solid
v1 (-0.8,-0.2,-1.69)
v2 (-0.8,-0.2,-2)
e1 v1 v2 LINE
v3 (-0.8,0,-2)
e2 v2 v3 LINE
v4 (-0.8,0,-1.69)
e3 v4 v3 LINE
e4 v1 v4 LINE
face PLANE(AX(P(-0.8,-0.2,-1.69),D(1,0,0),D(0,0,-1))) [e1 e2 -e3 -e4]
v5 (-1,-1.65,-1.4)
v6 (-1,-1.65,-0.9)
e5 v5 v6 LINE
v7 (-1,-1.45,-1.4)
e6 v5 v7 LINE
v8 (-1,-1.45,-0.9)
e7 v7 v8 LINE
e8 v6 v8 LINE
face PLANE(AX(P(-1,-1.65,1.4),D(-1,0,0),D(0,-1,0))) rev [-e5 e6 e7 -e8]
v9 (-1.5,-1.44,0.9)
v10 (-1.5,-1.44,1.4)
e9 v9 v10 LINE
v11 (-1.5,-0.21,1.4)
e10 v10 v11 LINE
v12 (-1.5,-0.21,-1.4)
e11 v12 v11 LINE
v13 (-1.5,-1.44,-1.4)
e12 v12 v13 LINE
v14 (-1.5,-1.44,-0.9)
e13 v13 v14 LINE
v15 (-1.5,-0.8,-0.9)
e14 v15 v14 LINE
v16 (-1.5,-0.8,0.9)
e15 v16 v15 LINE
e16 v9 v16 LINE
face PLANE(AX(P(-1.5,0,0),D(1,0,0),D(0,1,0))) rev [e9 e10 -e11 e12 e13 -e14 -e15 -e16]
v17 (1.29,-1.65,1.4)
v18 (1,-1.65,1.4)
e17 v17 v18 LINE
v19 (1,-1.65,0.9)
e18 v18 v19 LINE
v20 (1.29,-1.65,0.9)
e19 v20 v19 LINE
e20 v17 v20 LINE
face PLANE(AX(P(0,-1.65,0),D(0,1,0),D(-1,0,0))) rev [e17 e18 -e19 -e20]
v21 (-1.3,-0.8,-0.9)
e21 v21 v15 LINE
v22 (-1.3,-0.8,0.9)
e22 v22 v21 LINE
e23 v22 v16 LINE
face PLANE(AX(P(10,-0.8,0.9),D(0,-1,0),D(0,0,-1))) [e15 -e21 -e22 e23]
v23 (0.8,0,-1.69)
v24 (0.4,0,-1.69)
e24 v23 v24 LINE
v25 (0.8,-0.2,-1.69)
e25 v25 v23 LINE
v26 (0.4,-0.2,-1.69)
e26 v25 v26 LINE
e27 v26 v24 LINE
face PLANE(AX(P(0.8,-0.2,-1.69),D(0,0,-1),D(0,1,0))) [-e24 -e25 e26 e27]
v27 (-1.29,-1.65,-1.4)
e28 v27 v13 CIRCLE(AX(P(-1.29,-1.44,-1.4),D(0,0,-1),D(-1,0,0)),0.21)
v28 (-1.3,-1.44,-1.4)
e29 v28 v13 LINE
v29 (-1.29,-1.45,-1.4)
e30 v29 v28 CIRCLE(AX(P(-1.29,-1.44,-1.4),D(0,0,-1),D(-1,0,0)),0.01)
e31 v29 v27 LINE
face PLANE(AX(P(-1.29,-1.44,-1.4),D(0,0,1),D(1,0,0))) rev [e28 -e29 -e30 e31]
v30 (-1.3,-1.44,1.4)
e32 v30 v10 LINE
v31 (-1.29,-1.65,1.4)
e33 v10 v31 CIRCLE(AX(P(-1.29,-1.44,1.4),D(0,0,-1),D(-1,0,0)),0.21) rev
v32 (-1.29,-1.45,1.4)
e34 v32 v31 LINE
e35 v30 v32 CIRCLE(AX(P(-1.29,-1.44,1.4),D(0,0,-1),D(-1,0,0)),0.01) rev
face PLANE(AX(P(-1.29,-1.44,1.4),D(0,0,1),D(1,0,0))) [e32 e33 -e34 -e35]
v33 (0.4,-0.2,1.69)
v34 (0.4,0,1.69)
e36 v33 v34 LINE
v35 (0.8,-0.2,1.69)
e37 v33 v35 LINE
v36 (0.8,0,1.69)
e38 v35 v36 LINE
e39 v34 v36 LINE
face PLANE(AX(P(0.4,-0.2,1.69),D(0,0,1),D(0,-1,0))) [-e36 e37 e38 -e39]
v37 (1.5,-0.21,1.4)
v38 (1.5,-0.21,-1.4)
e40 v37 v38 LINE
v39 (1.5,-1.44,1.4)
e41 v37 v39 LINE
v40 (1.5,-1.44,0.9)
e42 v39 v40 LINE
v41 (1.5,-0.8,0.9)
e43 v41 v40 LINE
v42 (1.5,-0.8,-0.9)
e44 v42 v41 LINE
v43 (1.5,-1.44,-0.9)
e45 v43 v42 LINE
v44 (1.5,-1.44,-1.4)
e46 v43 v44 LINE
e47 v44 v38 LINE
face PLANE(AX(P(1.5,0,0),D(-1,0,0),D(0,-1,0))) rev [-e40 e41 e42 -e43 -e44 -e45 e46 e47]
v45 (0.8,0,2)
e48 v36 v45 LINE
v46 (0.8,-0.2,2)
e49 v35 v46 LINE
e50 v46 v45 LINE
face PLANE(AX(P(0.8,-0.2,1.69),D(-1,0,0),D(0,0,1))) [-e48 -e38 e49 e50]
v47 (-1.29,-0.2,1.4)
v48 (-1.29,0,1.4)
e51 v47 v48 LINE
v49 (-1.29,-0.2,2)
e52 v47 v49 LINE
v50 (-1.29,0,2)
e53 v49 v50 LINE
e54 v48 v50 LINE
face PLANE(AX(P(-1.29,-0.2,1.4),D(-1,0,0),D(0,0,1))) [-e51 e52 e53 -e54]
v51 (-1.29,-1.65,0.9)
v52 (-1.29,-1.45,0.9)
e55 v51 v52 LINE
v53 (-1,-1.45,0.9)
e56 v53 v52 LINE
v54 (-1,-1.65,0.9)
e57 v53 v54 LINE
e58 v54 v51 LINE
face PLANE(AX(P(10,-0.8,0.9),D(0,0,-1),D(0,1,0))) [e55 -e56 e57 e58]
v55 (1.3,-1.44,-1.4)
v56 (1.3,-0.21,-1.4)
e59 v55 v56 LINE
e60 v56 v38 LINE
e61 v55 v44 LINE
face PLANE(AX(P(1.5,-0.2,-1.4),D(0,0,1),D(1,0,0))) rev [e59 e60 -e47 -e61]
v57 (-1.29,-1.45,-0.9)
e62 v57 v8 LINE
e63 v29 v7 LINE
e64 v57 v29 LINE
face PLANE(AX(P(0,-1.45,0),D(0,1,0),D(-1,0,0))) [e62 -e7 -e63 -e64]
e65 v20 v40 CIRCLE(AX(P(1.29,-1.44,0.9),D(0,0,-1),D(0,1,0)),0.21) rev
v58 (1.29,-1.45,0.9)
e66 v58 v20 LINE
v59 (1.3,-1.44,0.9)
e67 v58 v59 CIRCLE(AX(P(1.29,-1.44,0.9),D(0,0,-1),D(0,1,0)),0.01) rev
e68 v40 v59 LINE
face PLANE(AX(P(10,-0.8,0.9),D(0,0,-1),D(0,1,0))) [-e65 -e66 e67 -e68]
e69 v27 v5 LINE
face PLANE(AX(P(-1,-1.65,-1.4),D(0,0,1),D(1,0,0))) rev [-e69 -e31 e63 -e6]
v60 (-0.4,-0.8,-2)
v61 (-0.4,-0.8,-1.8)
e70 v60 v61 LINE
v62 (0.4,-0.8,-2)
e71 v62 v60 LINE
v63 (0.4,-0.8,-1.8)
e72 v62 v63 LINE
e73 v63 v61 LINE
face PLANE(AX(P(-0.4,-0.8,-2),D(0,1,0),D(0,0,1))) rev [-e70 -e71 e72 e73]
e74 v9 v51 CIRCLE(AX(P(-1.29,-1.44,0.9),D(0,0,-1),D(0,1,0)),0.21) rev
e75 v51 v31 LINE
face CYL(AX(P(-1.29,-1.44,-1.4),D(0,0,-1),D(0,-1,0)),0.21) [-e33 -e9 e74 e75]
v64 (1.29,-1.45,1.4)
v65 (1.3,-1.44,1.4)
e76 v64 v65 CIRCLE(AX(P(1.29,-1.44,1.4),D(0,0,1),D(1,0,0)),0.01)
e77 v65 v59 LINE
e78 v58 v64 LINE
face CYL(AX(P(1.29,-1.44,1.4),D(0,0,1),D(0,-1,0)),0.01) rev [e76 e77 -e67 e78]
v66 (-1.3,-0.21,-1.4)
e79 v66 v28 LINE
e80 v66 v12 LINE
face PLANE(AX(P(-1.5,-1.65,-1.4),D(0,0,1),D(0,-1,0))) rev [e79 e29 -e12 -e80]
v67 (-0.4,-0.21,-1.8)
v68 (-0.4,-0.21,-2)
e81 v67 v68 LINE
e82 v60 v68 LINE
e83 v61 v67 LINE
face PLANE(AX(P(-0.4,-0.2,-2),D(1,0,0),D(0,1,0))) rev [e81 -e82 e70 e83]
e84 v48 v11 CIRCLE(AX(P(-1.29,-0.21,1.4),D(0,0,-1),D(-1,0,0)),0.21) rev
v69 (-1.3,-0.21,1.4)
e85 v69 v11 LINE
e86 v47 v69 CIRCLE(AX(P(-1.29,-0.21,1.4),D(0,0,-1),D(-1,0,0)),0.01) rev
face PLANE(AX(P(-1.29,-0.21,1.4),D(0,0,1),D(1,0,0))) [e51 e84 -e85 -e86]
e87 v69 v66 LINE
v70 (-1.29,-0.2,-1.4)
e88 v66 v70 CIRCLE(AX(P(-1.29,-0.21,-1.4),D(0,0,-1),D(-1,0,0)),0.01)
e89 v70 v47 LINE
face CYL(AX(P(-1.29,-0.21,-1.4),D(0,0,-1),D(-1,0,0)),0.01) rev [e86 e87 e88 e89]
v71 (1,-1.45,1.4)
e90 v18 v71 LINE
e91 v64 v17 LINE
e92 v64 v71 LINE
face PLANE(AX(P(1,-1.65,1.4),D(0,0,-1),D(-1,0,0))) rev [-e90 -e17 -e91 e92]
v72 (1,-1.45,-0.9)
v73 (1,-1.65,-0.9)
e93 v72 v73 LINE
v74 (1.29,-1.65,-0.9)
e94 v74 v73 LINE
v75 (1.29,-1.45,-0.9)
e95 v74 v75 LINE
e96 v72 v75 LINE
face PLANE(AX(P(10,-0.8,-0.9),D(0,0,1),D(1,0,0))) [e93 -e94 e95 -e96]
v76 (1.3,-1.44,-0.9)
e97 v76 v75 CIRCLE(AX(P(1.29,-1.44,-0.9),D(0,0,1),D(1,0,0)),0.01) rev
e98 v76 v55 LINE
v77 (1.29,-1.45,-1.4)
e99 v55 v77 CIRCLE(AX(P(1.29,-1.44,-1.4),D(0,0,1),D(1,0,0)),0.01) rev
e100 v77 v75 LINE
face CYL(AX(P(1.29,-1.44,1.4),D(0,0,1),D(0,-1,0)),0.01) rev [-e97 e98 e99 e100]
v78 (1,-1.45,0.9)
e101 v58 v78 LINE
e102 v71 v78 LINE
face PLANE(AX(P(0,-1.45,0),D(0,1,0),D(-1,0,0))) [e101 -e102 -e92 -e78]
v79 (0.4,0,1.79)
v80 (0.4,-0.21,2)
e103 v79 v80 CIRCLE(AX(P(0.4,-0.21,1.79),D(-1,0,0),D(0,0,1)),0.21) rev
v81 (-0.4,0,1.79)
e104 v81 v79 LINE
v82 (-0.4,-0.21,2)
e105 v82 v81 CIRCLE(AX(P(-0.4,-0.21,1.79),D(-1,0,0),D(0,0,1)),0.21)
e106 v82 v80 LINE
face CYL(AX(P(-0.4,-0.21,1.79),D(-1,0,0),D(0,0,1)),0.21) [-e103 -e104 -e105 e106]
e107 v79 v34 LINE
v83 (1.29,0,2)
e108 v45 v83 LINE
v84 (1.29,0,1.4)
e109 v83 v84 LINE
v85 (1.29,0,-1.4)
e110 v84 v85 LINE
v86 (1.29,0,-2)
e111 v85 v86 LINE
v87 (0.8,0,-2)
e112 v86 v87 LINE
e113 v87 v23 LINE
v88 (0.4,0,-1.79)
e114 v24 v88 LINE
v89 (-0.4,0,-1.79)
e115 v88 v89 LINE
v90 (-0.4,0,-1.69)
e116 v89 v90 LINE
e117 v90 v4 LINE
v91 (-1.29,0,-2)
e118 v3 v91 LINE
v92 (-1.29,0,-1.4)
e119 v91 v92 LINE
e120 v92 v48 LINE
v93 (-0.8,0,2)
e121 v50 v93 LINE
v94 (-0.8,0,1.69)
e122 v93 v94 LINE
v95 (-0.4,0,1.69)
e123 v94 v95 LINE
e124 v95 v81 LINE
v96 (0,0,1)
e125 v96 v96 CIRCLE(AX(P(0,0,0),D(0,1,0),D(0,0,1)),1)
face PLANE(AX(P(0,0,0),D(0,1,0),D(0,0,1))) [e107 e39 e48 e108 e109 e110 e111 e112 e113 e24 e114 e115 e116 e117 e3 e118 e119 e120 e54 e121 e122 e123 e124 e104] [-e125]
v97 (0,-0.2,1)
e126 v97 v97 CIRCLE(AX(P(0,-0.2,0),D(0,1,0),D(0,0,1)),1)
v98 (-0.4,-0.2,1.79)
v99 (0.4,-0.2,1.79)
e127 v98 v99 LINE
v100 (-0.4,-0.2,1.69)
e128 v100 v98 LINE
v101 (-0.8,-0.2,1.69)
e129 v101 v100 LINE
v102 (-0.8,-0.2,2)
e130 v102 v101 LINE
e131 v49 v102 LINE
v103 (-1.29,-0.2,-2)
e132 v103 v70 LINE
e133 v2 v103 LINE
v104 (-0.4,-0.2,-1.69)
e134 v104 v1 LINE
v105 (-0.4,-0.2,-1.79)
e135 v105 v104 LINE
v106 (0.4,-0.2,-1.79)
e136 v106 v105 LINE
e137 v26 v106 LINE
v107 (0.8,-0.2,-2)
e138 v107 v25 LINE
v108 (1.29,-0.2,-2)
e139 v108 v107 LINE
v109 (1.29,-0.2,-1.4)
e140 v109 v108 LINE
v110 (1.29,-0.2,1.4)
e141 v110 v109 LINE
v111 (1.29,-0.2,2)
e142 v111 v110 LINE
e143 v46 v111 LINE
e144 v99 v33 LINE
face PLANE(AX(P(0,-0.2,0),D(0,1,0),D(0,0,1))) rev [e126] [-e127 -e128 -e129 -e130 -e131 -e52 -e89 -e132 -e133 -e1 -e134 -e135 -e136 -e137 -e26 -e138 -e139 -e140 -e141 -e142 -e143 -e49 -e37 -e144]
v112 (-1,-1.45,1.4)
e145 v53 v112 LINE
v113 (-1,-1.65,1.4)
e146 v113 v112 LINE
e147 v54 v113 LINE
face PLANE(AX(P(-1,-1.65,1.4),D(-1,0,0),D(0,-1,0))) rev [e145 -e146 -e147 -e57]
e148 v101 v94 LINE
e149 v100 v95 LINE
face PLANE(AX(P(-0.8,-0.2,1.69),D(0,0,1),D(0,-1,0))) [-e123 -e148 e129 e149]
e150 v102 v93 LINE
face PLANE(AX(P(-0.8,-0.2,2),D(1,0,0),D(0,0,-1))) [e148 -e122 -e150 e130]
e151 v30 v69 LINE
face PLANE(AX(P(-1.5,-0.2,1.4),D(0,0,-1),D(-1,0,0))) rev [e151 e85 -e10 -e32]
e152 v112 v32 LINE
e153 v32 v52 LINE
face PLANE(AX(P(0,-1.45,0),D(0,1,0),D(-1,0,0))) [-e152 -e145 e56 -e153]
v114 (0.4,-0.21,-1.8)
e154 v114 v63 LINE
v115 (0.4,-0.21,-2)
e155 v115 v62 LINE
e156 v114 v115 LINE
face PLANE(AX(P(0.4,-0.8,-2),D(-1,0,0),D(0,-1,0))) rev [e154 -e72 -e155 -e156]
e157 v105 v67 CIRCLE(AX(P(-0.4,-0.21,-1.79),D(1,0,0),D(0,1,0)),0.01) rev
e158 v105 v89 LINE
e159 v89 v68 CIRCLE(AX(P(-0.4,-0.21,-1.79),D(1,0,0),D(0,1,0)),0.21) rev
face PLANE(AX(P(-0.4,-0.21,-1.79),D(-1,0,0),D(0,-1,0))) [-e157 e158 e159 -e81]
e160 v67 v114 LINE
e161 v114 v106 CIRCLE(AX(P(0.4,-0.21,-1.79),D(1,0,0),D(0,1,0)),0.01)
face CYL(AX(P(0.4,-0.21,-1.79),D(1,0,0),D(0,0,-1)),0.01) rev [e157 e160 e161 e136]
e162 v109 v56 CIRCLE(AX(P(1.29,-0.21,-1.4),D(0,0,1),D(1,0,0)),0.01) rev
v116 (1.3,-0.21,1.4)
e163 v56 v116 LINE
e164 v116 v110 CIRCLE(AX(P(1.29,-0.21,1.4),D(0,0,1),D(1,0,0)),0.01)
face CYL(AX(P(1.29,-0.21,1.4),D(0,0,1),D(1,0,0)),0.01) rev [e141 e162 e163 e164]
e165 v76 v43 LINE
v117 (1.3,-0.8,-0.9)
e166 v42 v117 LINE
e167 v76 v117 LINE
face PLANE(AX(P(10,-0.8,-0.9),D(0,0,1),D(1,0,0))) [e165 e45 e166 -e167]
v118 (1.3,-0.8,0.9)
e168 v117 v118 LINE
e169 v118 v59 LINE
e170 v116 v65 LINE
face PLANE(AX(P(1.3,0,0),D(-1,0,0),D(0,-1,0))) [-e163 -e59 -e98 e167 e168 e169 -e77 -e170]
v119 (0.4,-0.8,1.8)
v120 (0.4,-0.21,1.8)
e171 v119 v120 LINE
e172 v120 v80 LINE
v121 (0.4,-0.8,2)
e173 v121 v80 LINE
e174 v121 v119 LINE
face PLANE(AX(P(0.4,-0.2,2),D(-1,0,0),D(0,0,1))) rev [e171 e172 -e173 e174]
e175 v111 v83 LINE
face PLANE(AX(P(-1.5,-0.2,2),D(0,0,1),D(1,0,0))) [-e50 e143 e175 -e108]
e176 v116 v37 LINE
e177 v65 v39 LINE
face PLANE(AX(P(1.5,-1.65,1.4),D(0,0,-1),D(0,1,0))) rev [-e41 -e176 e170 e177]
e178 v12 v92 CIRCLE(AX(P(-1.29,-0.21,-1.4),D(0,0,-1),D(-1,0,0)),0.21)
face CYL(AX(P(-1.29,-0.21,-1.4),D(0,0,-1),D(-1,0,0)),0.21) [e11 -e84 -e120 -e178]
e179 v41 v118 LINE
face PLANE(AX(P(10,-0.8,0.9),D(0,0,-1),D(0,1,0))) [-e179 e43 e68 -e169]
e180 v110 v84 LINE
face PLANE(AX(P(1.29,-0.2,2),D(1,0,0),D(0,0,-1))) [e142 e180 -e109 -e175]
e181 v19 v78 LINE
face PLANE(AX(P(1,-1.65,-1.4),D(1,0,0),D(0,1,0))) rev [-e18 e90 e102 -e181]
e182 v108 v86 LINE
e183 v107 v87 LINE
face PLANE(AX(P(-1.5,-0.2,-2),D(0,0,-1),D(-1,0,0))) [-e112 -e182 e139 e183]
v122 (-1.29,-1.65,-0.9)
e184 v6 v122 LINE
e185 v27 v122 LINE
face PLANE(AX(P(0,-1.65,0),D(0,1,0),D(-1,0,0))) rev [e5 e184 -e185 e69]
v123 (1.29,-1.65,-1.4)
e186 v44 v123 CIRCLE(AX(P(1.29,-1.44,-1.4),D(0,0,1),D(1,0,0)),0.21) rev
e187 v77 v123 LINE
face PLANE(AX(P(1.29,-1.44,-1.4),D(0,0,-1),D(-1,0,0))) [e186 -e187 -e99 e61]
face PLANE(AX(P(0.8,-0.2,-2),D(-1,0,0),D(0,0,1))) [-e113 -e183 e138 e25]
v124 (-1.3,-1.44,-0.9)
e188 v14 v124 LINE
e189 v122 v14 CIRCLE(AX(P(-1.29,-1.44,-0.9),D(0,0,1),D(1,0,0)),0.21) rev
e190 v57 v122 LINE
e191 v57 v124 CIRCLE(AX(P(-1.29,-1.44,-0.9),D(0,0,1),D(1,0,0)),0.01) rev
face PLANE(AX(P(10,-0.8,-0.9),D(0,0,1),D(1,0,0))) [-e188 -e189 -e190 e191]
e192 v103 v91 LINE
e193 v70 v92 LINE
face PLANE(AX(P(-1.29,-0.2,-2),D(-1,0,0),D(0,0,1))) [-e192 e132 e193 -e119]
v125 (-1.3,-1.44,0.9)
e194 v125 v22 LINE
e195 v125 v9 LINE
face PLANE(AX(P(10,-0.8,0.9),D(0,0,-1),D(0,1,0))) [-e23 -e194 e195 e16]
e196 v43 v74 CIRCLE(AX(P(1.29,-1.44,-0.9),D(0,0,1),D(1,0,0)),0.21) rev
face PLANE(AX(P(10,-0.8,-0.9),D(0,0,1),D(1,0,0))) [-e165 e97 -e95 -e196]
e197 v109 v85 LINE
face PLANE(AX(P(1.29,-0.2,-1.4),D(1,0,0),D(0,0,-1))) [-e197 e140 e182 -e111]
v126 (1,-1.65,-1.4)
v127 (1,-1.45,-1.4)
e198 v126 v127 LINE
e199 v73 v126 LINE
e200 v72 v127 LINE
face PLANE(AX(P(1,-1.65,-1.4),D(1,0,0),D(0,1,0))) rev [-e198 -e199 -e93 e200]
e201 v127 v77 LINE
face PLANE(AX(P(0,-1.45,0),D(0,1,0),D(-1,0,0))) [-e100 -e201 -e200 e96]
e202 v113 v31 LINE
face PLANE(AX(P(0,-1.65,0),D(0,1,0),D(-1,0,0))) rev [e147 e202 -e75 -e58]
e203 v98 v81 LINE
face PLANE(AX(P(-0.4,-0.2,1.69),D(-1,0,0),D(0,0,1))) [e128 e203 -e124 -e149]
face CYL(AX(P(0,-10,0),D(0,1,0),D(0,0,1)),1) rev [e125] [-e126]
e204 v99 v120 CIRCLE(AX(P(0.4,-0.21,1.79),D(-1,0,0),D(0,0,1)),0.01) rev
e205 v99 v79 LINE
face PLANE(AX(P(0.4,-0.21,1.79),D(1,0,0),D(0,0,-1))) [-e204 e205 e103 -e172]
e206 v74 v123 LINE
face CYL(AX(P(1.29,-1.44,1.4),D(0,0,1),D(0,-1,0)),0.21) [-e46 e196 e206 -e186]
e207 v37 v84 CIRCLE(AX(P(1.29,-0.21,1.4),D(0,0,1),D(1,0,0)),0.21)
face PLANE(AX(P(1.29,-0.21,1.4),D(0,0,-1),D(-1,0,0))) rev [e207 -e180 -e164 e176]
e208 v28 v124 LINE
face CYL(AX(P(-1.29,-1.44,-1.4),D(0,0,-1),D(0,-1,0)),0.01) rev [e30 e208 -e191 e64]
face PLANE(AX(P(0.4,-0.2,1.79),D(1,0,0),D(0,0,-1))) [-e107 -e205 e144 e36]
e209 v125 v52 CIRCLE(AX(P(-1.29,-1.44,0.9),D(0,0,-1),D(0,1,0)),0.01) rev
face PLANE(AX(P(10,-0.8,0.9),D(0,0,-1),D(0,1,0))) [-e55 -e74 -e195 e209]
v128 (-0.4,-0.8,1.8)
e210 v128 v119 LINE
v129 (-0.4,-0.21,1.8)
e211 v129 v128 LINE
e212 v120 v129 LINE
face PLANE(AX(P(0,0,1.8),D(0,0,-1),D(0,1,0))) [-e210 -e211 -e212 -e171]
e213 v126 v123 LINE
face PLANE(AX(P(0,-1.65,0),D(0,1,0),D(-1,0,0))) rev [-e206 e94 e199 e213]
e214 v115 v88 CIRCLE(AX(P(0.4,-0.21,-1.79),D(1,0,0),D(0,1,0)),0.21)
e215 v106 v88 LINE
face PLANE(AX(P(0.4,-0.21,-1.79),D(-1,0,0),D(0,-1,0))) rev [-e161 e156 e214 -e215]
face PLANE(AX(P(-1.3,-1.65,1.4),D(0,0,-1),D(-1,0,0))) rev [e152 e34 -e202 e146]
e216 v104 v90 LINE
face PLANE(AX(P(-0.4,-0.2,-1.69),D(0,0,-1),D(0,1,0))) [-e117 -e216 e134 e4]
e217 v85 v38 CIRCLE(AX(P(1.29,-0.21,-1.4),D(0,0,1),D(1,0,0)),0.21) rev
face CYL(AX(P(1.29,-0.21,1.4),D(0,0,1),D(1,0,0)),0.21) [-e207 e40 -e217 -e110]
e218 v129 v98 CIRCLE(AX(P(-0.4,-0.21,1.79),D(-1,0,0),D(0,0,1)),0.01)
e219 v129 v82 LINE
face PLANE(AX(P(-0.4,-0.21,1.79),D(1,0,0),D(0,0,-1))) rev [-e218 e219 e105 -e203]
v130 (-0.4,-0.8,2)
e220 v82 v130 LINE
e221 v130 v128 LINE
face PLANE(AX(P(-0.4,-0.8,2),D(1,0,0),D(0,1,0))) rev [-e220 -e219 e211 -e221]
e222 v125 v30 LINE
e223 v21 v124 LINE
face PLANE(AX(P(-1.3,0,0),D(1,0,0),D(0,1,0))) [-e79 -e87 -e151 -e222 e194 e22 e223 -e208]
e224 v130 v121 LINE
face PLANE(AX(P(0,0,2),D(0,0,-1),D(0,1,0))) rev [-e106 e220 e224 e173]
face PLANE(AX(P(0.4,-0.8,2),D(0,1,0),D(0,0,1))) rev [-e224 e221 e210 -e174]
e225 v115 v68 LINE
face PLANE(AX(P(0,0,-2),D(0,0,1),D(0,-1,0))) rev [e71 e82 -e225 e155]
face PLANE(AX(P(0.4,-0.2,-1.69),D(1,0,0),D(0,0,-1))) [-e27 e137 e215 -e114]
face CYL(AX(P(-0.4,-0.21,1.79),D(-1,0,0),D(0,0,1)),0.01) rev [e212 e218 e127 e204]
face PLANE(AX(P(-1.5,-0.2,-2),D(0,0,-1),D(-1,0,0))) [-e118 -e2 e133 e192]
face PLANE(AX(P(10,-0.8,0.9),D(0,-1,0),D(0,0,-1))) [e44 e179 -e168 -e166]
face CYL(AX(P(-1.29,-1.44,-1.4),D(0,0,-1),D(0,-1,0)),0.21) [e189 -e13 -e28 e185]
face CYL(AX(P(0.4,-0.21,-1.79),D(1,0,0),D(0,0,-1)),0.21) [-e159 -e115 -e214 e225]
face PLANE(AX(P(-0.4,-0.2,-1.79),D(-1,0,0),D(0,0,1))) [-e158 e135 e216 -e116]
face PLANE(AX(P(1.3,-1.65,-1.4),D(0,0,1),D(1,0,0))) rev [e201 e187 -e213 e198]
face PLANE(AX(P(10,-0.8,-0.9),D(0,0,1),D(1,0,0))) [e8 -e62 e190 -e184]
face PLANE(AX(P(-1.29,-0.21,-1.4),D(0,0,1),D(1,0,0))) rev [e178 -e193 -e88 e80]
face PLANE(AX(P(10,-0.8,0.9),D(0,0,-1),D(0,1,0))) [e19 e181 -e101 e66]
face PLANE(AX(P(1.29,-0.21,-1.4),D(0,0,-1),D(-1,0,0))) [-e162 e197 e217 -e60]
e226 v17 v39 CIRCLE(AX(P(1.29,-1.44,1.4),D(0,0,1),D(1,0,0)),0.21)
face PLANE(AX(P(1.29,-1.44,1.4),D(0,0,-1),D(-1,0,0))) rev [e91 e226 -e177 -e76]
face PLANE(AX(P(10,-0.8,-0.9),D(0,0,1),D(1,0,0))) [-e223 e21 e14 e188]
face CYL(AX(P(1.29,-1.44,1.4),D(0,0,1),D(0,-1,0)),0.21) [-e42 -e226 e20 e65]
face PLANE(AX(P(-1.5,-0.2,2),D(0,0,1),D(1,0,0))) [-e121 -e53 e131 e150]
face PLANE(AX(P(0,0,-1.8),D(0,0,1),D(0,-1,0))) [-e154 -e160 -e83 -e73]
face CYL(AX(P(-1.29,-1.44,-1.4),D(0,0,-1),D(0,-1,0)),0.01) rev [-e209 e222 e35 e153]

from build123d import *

# Parameters (mm, degrees)
SKETCH1_W                       = 3
SKETCH1_H                       = 4
BASE_FLANGE1_DEPTH              = 0.2
EDGE_FLANGE1_STRIP_W            = 0.82
EDGE_FLANGE1_STRIP_H            = 0.2
EDGE_FLANGE1_STRIP_CUT_DEPTH    = 0.8
EDGE_FLANGE1_RELIEF_W           = 0.92
EDGE_FLANGE1_RELIEF_H           = 0.4
EDGE_FLANGE1_RELIEF_CUT_DEPTH   = 0.2
EDGE_FLANGE1_STRIP_2_W          = 0.82
EDGE_FLANGE1_STRIP_2_H          = 0.2
EDGE_FLANGE1_STRIP_CUT_2_DEPTH  = 0.8
EDGE_FLANGE1_RELIEF_2_W         = 0.92
EDGE_FLANGE1_RELIEF_2_H         = 0.4
EDGE_FLANGE1_RELIEF_CUT_2_DEPTH = 0.2
EDGE_FLANGE1_DEPTH              = 0.8
EDGE_FLANGE1_BEND_DEPTH         = 0.8
EDGE_FLANGE2_STRIP_W            = 0.82
EDGE_FLANGE2_STRIP_H            = 0.2
EDGE_FLANGE2_STRIP_CUT_DEPTH    = 2.8
EDGE_FLANGE2_RELIEF_W           = 0.82
EDGE_FLANGE2_RELIEF_H           = 0.6
EDGE_FLANGE2_RELIEF_CUT_DEPTH   = 0.2
EDGE_FLANGE2_STRIP_2_W          = 0.82
EDGE_FLANGE2_STRIP_2_H          = 0.2
EDGE_FLANGE2_STRIP_CUT_2_DEPTH  = 2.8
EDGE_FLANGE2_RELIEF_2_W         = 0.82
EDGE_FLANGE2_RELIEF_2_H         = 0.6
EDGE_FLANGE2_RELIEF_CUT_2_DEPTH = 0.2
EDGE_FLANGE2_DEPTH              = 2.8
EDGE_FLANGE2_BEND_DEPTH         = 2.8
EDGE_FLANGE3_STRIP_W            = 0.82
EDGE_FLANGE3_STRIP_H            = 0.2
EDGE_FLANGE3_STRIP_CUT_DEPTH    = 2.8
EDGE_FLANGE3_STRIP_2_W          = 0.82
EDGE_FLANGE3_STRIP_2_H          = 0.2
EDGE_FLANGE3_STRIP_CUT_2_DEPTH  = 2.8
EDGE_FLANGE3_DEPTH              = 2.8
EDGE_FLANGE3_BEND_DEPTH         = 2.8
CUT_EXTRUDE1_DEPTH              = 10
CUT_EXTRUDE1_DEPTH_BACK         = 10
SKETCH23_W                      = 1.8
SKETCH23_H                      = 0.85
SKETCH24_R                      = 1
CUT_EXTRUDE2_DEPTH              = 10


# Sheet-metal steps are written as plain solids
with BuildPart() as part:
    # Sketch1 → Base-Flange1 (new body)
    with BuildSketch(Plane(origin=(0, 0, 0), x_dir=(1, 0, 0), z_dir=(0, 1, 0))):
        Rectangle(SKETCH1_W, SKETCH1_H)
    extrude(amount=-BASE_FLANGE1_DEPTH)

    # Edge-Flange1 strip (across the edge) → Edge-Flange1 strip cut (cut)
    with BuildSketch(Plane(origin=(0.4, -0.2, 2), x_dir=(0, 0, -1), z_dir=(-1, 0, 0))):
        with Locations((-0.2, -0.1)):
            Rectangle(EDGE_FLANGE1_STRIP_W, EDGE_FLANGE1_STRIP_H)
    extrude(amount=EDGE_FLANGE1_STRIP_CUT_DEPTH, mode=Mode.SUBTRACT)

    # Edge-Flange1 relief (on the sheet) → Edge-Flange1 relief cut (cut)
    with BuildSketch(Plane(origin=(0.4, -0.2, 1.79), x_dir=(0, 0, -1), z_dir=(0, -1, 0))):
        with Locations((-0.36, 0.2)):
            Rectangle(EDGE_FLANGE1_RELIEF_W, EDGE_FLANGE1_RELIEF_H)
        with Locations((-0.36, -1)):
            Rectangle(EDGE_FLANGE1_RELIEF_W, EDGE_FLANGE1_RELIEF_H)
    extrude(amount=-EDGE_FLANGE1_RELIEF_CUT_DEPTH, mode=Mode.SUBTRACT)

    # Edge-Flange1 strip 2 (across the edge) → Edge-Flange1 strip cut 2 (cut)
    with BuildSketch(Plane(origin=(-0.4, -0.2, -2), x_dir=(0, 0, 1), z_dir=(1, 0, 0))):
        with Locations((-0.2, -0.1)):
            Rectangle(EDGE_FLANGE1_STRIP_2_W, EDGE_FLANGE1_STRIP_2_H)
    extrude(amount=EDGE_FLANGE1_STRIP_CUT_2_DEPTH, mode=Mode.SUBTRACT)

    # Edge-Flange1 relief 2 (on the sheet) → Edge-Flange1 relief cut 2 (cut)
    with BuildSketch(Plane(origin=(-0.4, -0.2, -1.79), x_dir=(0, 0, 1), z_dir=(0, -1, 0))):
        with Locations((-0.36, 0.2)):
            Rectangle(EDGE_FLANGE1_RELIEF_2_W, EDGE_FLANGE1_RELIEF_2_H)
        with Locations((-0.36, -1)):
            Rectangle(EDGE_FLANGE1_RELIEF_2_W, EDGE_FLANGE1_RELIEF_2_H)
    extrude(amount=-EDGE_FLANGE1_RELIEF_CUT_2_DEPTH, mode=Mode.SUBTRACT)

    # Edge-Flange1 section (across the edge) → Edge-Flange1 (add)
    with BuildSketch(Plane(origin=(0.4, -0.2, 2), x_dir=(0, 0, -1), z_dir=(-1, 0, 0))):
        with BuildLine():
            Line((0, 0.01), (0, 0.6))
            Line((0, 0.6), (0.2, 0.6))
            Line((0.2, 0.6), (0.2, 0.01))
            ThreePointArc((0.2, 0.01), (0.202928932, 0.002928932), (0.21, 0))
            Line((0.21, 0), (0.21, -0.2))
            ThreePointArc((0.21, -0.2), (0.061507576, -0.138492424), (0, 0.01))
        make_face()
    extrude(amount=EDGE_FLANGE1_DEPTH)

    # Edge-Flange1 section 2 (across the edge) → Edge-Flange1 bend (add)
    with BuildSketch(Plane(origin=(-0.4, -0.2, -2), x_dir=(0, 0, 1), z_dir=(1, 0, 0))):
        with BuildLine():
            Line((0, 0.01), (0, 0.6))
            Line((0, 0.6), (0.2, 0.6))
            Line((0.2, 0.6), (0.2, 0.01))
            ThreePointArc((0.2, 0.01), (0.202928932, 0.002928932), (0.21, 0))
            Line((0.21, 0), (0.21, -0.2))
            ThreePointArc((0.21, -0.2), (0.061507576, -0.138492424), (0, 0.01))
        make_face()
    extrude(amount=EDGE_FLANGE1_BEND_DEPTH)

    # Edge-Flange2 strip (across the edge) → Edge-Flange2 strip cut (cut)
    with BuildSketch(Plane(origin=(-1.5, -0.2, 1.4), x_dir=(1, 0, 0), z_dir=(0, 0, -1))):
        with Locations((-0.2, -0.1)):
            Rectangle(EDGE_FLANGE2_STRIP_W, EDGE_FLANGE2_STRIP_H)
    extrude(amount=EDGE_FLANGE2_STRIP_CUT_DEPTH, mode=Mode.SUBTRACT)

    # Edge-Flange2 relief (on the sheet) → Edge-Flange2 relief cut (cut)
    with BuildSketch(Plane(origin=(-1.29, -0.2, 1.4), x_dir=(1, 0, 0), z_dir=(0, -1, 0))):
        with Locations((-0.41, 0.3)):
            Rectangle(EDGE_FLANGE2_RELIEF_W, EDGE_FLANGE2_RELIEF_H)
        with Locations((-0.41, -3.1)):
            Rectangle(EDGE_FLANGE2_RELIEF_W, EDGE_FLANGE2_RELIEF_H)
    extrude(amount=-EDGE_FLANGE2_RELIEF_CUT_DEPTH, mode=Mode.SUBTRACT)

    # Edge-Flange2 strip 2 (across the edge) → Edge-Flange2 strip cut 2 (cut)
    with BuildSketch(Plane(origin=(1.5, -0.2, -1.4), x_dir=(-1, 0, 0), z_dir=(0, 0, 1))):
        with Locations((-0.2, -0.1)):
            Rectangle(EDGE_FLANGE2_STRIP_2_W, EDGE_FLANGE2_STRIP_2_H)
    extrude(amount=EDGE_FLANGE2_STRIP_CUT_2_DEPTH, mode=Mode.SUBTRACT)

    # Edge-Flange2 relief 2 (on the sheet) → Edge-Flange2 relief cut 2 (cut)
    with BuildSketch(Plane(origin=(1.29, -0.2, -1.4), x_dir=(-1, 0, 0), z_dir=(0, -1, 0))):
        with Locations((-0.41, 0.3)):
            Rectangle(EDGE_FLANGE2_RELIEF_2_W, EDGE_FLANGE2_RELIEF_2_H)
        with Locations((-0.41, -3.1)):
            Rectangle(EDGE_FLANGE2_RELIEF_2_W, EDGE_FLANGE2_RELIEF_2_H)
    extrude(amount=-EDGE_FLANGE2_RELIEF_CUT_2_DEPTH, mode=Mode.SUBTRACT)

    # Edge-Flange2 section (across the edge) → Edge-Flange2 (add)
    with BuildSketch(Plane(origin=(-1.5, -0.2, 1.4), x_dir=(1, 0, 0), z_dir=(0, 0, -1))):
        with BuildLine():
            Line((0, 0.01), (0, 1.45))
            Line((0, 1.45), (0.2, 1.45))
            Line((0.2, 1.45), (0.2, 0.01))
            ThreePointArc((0.2, 0.01), (0.202928932, 0.002928932), (0.21, 0))
            Line((0.21, 0), (0.21, -0.2))
            ThreePointArc((0.21, -0.2), (0.061507576, -0.138492424), (0, 0.01))
        make_face()
    extrude(amount=EDGE_FLANGE2_DEPTH)

    # Edge-Flange2 section 2 (across the edge) → Edge-Flange2 bend (add)
    with BuildSketch(Plane(origin=(1.5, -0.2, -1.4), x_dir=(-1, 0, 0), z_dir=(0, 0, 1))):
        with BuildLine():
            Line((0, 0.01), (0, 1.45))
            Line((0, 1.45), (0.2, 1.45))
            Line((0.2, 1.45), (0.2, 0.01))
            ThreePointArc((0.2, 0.01), (0.202928932, 0.002928932), (0.21, 0))
            Line((0.21, 0), (0.21, -0.2))
            ThreePointArc((0.21, -0.2), (0.061507576, -0.138492424), (0, 0.01))
        make_face()
    extrude(amount=EDGE_FLANGE2_BEND_DEPTH)

    # Edge-Flange3 strip (across the edge) → Edge-Flange3 strip cut (cut)
    with BuildSketch(Plane(origin=(-1.3, -1.65, 1.4), x_dir=(0, 1, 0), z_dir=(0, 0, -1))):
        with Locations((-0.2, -0.1)):
            Rectangle(EDGE_FLANGE3_STRIP_W, EDGE_FLANGE3_STRIP_H)
    extrude(amount=EDGE_FLANGE3_STRIP_CUT_DEPTH, mode=Mode.SUBTRACT)

    # Edge-Flange3 strip 2 (across the edge) → Edge-Flange3 strip cut 2 (cut)
    with BuildSketch(Plane(origin=(1.3, -1.65, -1.4), x_dir=(0, 1, 0), z_dir=(0, 0, 1))):
        with Locations((-0.2, -0.1)):
            Rectangle(EDGE_FLANGE3_STRIP_2_W, EDGE_FLANGE3_STRIP_2_H)
    extrude(amount=EDGE_FLANGE3_STRIP_CUT_2_DEPTH, mode=Mode.SUBTRACT)

    # Edge-Flange3 section (across the edge) → Edge-Flange3 (add)
    with BuildSketch(Plane(origin=(-1.3, -1.65, 1.4), x_dir=(0, 1, 0), z_dir=(0, 0, -1))):
        with BuildLine():
            Line((0, 0.01), (0, 0.3))
            Line((0, 0.3), (0.2, 0.3))
            Line((0.2, 0.3), (0.2, 0.01))
            ThreePointArc((0.2, 0.01), (0.202928932, 0.002928932), (0.21, 0))
            Line((0.21, 0), (0.21, -0.2))
            ThreePointArc((0.21, -0.2), (0.061507576, -0.138492424), (0, 0.01))
        make_face()
    extrude(amount=EDGE_FLANGE3_DEPTH)

    # Edge-Flange3 section 2 (across the edge) → Edge-Flange3 bend (add)
    with BuildSketch(Plane(origin=(1.3, -1.65, -1.4), x_dir=(0, 1, 0), z_dir=(0, 0, 1))):
        with BuildLine():
            Line((0, 0.01), (0, 0.3))
            Line((0, 0.3), (0.2, 0.3))
            Line((0.2, 0.3), (0.2, 0.01))
            ThreePointArc((0.2, 0.01), (0.202928932, 0.002928932), (0.21, 0))
            Line((0.21, 0), (0.21, -0.2))
            ThreePointArc((0.21, -0.2), (0.061507576, -0.138492424), (0, 0.01))
        make_face()
    extrude(amount=EDGE_FLANGE3_BEND_DEPTH)

    # Sketch23 → Cut-Extrude1 (cut, two sides: drawn at the far end of the back side and taken through both)
    with BuildSketch(Plane(origin=(0, 0, 0), x_dir=(0, 0, -1), z_dir=(1, 0, 0)).offset(-CUT_EXTRUDE1_DEPTH_BACK)):
        with Locations((0, -1.225)):
            Rectangle(SKETCH23_W, SKETCH23_H)
    extrude(amount=CUT_EXTRUDE1_DEPTH + CUT_EXTRUDE1_DEPTH_BACK, mode=Mode.SUBTRACT)

    # Sketch24 → Cut-Extrude2 (cut)
    with BuildSketch(Plane(origin=(0, 0, 0), x_dir=(1, 0, 0), z_dir=(0, 1, 0))):
        with Locations(Location((0, 0, 0), (0, 0, 270))):
            Circle(SKETCH24_R)
    extrude(amount=-CUT_EXTRUDE2_DEPTH, mode=Mode.SUBTRACT)


solid = part.part
